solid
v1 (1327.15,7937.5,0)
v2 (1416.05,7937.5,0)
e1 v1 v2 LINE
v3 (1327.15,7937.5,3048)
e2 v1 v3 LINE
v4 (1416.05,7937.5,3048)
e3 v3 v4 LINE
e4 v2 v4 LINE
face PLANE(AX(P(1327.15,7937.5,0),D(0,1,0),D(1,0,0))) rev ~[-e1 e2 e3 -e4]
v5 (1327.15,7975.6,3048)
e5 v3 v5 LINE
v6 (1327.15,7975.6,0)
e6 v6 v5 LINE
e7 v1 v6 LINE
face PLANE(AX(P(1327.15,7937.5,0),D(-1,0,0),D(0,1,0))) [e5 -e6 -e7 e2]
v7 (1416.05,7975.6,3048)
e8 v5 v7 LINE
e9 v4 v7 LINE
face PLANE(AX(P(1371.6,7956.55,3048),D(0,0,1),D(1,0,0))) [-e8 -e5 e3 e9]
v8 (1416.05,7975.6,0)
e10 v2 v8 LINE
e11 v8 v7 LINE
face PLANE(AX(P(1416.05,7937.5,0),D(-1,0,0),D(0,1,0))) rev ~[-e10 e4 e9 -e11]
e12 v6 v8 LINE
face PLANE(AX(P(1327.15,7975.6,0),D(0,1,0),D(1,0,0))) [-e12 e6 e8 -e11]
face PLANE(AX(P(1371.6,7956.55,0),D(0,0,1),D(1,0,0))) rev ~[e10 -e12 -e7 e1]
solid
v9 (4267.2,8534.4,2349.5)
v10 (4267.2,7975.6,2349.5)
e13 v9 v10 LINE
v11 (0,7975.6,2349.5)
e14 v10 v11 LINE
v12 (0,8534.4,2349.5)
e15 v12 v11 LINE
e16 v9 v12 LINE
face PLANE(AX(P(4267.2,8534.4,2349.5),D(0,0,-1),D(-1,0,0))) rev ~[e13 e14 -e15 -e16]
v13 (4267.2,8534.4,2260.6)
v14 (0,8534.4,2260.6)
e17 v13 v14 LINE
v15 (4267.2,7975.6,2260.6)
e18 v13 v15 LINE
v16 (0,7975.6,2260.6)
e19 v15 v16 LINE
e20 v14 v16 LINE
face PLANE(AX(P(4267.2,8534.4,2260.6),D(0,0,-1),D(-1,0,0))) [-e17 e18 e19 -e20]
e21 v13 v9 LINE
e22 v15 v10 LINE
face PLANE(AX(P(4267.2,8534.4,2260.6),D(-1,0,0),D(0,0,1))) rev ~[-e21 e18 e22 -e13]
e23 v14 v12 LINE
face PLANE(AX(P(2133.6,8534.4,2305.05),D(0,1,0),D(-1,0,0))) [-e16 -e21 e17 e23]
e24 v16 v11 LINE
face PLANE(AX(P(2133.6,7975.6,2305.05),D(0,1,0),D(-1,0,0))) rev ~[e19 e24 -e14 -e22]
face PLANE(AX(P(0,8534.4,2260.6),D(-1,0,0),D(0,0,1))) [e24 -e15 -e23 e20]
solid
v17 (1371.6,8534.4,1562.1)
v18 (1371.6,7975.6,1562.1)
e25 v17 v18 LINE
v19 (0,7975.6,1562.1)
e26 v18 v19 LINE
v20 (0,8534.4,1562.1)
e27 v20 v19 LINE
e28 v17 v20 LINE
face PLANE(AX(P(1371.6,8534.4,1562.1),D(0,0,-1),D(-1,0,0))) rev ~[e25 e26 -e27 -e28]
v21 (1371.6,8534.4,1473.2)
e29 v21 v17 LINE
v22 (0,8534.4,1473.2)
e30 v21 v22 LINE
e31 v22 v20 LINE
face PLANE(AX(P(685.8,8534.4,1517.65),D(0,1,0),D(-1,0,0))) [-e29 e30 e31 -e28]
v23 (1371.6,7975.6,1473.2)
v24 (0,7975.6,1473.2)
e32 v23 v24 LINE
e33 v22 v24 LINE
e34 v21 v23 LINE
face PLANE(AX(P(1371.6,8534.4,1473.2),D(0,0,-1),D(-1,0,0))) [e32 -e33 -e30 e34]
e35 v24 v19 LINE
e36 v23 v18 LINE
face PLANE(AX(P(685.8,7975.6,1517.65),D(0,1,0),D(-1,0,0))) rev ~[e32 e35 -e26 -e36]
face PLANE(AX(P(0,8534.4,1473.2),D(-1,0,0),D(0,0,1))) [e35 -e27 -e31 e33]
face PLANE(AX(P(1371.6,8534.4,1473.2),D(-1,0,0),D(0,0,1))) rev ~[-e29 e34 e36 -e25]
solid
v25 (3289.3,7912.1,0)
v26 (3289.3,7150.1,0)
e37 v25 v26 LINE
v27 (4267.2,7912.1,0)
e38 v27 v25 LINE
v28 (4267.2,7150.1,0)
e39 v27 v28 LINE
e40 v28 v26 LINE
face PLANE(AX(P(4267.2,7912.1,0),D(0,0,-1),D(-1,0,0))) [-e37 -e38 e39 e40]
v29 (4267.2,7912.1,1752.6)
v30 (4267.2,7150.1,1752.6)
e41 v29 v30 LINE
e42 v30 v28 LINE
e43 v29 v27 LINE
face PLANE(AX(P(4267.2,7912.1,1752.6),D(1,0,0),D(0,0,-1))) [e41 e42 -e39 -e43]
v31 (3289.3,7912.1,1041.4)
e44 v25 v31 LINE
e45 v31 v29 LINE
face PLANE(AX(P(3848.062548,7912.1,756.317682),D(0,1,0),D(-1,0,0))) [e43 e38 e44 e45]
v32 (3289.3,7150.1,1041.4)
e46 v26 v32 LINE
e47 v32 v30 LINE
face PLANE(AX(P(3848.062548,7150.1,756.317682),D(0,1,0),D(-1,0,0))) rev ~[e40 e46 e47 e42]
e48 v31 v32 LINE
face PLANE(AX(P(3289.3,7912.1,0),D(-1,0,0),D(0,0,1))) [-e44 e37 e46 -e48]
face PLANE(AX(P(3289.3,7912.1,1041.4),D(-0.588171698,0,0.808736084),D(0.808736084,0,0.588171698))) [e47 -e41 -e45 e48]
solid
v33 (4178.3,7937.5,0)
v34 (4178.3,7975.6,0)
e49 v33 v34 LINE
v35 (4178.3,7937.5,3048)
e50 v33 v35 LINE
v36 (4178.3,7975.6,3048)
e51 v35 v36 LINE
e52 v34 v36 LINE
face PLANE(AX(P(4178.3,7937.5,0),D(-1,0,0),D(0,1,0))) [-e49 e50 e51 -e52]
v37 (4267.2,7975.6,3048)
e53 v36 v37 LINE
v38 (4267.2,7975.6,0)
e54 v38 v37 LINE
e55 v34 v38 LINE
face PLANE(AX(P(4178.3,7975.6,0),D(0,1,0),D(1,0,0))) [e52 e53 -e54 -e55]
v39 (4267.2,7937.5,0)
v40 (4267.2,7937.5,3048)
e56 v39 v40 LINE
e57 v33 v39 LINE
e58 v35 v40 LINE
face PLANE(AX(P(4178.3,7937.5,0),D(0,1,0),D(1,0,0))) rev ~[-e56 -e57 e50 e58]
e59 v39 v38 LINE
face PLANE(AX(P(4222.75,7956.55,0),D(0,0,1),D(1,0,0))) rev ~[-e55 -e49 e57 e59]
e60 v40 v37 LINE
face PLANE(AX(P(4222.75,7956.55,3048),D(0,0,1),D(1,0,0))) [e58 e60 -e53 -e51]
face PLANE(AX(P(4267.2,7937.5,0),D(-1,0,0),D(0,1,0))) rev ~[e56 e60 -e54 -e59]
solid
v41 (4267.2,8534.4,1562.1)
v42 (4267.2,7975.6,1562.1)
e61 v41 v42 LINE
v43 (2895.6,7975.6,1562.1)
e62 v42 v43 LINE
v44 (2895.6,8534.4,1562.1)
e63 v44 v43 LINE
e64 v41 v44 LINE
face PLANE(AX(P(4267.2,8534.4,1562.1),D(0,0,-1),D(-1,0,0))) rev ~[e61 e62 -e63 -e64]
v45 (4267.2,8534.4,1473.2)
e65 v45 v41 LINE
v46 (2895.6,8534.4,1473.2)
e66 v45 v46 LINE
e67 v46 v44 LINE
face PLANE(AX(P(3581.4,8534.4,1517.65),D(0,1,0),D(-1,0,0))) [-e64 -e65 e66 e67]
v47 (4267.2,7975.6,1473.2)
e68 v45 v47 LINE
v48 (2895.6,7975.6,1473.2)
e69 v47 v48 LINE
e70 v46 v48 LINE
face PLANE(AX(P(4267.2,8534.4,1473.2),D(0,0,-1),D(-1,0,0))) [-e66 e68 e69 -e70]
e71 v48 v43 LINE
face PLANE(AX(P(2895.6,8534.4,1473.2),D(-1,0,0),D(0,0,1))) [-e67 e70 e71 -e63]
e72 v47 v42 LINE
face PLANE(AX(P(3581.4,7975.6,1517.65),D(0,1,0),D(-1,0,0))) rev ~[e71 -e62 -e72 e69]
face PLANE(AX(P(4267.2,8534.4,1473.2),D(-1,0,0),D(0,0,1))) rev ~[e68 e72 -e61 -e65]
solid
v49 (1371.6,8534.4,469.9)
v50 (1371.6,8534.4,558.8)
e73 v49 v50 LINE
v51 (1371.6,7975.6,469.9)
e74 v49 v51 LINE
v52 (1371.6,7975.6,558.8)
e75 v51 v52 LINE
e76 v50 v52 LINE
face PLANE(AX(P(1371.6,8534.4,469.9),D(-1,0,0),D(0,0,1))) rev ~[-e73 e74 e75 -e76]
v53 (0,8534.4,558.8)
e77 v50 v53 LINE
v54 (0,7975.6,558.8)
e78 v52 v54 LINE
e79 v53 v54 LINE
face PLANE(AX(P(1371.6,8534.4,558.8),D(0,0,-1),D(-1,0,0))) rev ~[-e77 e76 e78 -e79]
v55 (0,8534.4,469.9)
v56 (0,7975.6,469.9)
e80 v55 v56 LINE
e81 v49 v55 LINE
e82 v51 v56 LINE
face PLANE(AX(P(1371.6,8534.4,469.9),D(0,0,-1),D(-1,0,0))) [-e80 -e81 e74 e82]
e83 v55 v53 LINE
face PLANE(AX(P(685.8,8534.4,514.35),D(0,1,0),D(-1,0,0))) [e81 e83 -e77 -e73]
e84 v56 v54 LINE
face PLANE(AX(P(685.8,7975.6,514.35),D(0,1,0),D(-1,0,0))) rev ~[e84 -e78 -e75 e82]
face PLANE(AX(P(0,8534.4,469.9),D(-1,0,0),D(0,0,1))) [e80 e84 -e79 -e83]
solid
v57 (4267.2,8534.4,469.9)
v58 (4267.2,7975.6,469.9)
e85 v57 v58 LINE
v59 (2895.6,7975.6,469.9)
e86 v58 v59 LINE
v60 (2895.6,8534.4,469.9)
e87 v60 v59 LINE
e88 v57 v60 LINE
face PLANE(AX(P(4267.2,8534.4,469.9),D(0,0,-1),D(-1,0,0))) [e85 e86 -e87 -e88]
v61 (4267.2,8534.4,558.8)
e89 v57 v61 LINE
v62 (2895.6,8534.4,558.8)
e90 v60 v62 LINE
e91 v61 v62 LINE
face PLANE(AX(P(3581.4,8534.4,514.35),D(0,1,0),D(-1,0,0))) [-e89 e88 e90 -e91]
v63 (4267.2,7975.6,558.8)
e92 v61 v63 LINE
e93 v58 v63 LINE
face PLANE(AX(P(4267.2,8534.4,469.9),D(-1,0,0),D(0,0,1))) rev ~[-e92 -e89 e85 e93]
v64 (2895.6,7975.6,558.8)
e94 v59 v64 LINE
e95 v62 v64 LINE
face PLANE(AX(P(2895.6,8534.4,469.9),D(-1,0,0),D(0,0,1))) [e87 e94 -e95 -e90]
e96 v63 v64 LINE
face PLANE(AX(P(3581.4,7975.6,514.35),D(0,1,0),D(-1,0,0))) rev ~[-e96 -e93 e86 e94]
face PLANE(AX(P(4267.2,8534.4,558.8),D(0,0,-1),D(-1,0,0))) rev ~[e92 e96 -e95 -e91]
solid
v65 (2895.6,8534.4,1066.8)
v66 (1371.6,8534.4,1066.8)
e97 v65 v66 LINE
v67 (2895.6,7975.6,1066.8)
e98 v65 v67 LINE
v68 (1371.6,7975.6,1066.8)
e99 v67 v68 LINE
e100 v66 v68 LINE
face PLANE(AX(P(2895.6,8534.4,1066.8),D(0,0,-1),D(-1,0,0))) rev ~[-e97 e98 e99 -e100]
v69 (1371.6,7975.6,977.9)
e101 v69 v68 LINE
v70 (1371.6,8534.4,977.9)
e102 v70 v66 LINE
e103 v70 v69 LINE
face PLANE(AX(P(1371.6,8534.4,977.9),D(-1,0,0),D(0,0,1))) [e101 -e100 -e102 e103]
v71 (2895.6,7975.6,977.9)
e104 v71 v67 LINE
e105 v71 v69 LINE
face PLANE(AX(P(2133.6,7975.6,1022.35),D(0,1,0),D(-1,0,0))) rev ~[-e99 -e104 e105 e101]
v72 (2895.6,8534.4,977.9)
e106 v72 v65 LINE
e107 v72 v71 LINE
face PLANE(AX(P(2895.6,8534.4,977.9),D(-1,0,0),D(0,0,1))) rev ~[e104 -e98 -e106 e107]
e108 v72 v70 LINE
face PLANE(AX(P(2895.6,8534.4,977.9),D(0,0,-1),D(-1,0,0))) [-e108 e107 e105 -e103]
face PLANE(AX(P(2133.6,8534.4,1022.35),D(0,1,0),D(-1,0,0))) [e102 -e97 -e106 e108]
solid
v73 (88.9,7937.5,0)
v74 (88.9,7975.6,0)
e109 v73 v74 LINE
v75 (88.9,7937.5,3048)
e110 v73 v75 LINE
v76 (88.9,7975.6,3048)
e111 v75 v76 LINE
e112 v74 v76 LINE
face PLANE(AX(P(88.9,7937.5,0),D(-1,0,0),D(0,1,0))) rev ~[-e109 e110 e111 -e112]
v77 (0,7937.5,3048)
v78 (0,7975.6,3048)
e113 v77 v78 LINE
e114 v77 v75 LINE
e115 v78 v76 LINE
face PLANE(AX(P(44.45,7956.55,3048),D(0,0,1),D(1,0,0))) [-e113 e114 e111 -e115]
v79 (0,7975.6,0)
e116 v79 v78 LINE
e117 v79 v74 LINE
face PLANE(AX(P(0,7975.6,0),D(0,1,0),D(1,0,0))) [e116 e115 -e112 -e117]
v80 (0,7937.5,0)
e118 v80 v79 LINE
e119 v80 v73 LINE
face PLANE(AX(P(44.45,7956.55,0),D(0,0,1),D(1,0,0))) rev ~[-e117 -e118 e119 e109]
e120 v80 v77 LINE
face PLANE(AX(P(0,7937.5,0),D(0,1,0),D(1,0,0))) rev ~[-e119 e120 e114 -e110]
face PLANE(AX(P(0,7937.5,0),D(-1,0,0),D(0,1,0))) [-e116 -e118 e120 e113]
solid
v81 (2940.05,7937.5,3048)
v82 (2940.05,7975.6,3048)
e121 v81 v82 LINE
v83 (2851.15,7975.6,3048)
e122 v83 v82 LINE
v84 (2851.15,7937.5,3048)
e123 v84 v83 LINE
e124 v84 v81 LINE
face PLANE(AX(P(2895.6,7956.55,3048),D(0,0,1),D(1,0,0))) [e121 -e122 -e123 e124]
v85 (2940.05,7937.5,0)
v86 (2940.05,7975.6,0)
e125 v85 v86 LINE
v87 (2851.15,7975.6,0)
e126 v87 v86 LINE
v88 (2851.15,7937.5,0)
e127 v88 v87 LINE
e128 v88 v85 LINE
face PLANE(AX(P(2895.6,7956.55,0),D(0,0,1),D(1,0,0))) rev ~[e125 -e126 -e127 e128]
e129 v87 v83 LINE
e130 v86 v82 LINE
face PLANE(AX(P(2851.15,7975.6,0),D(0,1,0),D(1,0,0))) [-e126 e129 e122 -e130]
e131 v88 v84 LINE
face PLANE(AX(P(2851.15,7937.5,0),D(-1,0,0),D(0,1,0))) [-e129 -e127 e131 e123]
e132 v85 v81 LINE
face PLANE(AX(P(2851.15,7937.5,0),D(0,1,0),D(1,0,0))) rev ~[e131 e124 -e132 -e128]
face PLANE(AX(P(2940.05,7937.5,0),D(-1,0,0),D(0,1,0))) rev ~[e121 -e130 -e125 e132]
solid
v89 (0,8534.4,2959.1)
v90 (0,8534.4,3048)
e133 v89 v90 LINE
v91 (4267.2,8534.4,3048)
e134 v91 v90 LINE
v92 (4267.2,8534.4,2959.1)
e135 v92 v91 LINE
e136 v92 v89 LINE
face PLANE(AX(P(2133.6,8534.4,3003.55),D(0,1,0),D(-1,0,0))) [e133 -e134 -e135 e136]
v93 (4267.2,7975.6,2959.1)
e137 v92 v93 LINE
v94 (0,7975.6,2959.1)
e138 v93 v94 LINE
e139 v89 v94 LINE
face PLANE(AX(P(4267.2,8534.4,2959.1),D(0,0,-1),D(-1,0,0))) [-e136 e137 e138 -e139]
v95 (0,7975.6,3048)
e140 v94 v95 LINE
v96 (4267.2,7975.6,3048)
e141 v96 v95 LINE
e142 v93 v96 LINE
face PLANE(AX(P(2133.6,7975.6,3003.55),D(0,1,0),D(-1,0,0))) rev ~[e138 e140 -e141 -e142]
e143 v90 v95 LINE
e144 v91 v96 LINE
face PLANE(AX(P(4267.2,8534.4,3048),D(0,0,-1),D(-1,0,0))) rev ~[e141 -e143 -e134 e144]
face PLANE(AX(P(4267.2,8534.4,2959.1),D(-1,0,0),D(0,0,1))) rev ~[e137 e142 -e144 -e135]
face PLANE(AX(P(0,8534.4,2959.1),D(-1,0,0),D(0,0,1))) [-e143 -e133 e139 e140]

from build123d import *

# Parameters (mm, degrees)
F4_DEPTH = 762
F5_W     = 1524
F5_H     = 88.9
F6_DEPTH = 558.8
F5_W_2   = 1371.6
F5_W_3   = 4267.2
F7_W     = 88.9
F7_H     = 38.1
F8_DEPTH = 3048


with BuildPart() as f4:
    # F3 (on face) → F4 (new body)
    with BuildSketch(Plane(origin=(0, 7912.1, 0), x_dir=(-1, 0, 0), z_dir=(0, 1, 0))):
        Polygon((-3289.3, 1041.4), (-4267.2, 1752.6), (-4267.2, 0), (-3289.3, 0), align=None)
    extrude(amount=-F4_DEPTH)


with BuildPart() as f6:
    # F5 (on face) → F6 (new body)
    with BuildSketch(Plane(origin=(0, 8534.4, 0), x_dir=(-1, 0, 0), z_dir=(0, 1, 0))):
        with Locations((-2133.6, 1022.35)):
            Rectangle(F5_W, F5_H)
    extrude(amount=-F6_DEPTH)


with BuildPart() as f6b:
    # F5 (on face) → F6, piece 2 (new body)
    with BuildSketch(Plane(origin=(0, 8534.4, 0), x_dir=(-1, 0, 0), z_dir=(0, 1, 0))):
        with Locations((-685.8, 1517.65)):
            Rectangle(F5_W_2, F5_H)
    extrude(amount=-F6_DEPTH)


with BuildPart() as f6c:
    # F5 (on face) → F6, piece 3 (new body)
    with BuildSketch(Plane(origin=(0, 8534.4, 0), x_dir=(-1, 0, 0), z_dir=(0, 1, 0))):
        with Locations((-685.8, 514.35)):
            Rectangle(F5_W_2, F5_H)
    extrude(amount=-F6_DEPTH)


with BuildPart() as f6d:
    # F5 (on face) → F6, piece 4 (new body)
    with BuildSketch(Plane(origin=(0, 8534.4, 0), x_dir=(-1, 0, 0), z_dir=(0, 1, 0))):
        with Locations((-2133.6, 3003.55)):
            Rectangle(F5_W_3, F5_H)
    extrude(amount=-F6_DEPTH)


with BuildPart() as f6e:
    # F5 (on face) → F6, piece 5 (new body)
    with BuildSketch(Plane(origin=(0, 8534.4, 0), x_dir=(-1, 0, 0), z_dir=(0, 1, 0))):
        with Locations((-3581.4, 1517.65)):
            Rectangle(F5_W_2, F5_H)
    extrude(amount=-F6_DEPTH)


with BuildPart() as f6f:
    # F5 (on face) → F6, piece 6 (new body)
    with BuildSketch(Plane(origin=(0, 8534.4, 0), x_dir=(-1, 0, 0), z_dir=(0, 1, 0))):
        with Locations((-3581.4, 514.35)):
            Rectangle(F5_W_2, F5_H)
    extrude(amount=-F6_DEPTH)


with BuildPart() as f6g:
    # F5 (on face) → F6, piece 7 (new body)
    with BuildSketch(Plane(origin=(0, 8534.4, 0), x_dir=(-1, 0, 0), z_dir=(0, 1, 0))):
        with Locations((-2133.6, 2305.05)):
            Rectangle(F5_W_3, F5_H)
    extrude(amount=-F6_DEPTH)


with BuildPart() as f8:
    # F7 (on face) → F8 (new body)
    with BuildSketch(Plane.XY):
        with Locations((4222.75, 7956.55)):
            Rectangle(F7_W, F7_H)
    extrude(amount=F8_DEPTH)


with BuildPart() as f8b:
    # F7 (on face) → F8, piece 2 (new body)
    with BuildSketch(Plane.XY):
        with Locations((2895.6, 7956.55)):
            Rectangle(F7_W, F7_H)
    extrude(amount=F8_DEPTH)


with BuildPart() as f8c:
    # F7 (on face) → F8, piece 3 (new body)
    with BuildSketch(Plane.XY):
        with Locations((1371.6, 7956.55)):
            Rectangle(F7_W, F7_H)
    extrude(amount=F8_DEPTH)


with BuildPart() as f8d:
    # F7 (on face) → F8, piece 4 (new body)
    with BuildSketch(Plane.XY):
        with Locations((44.45, 7956.55)):
            Rectangle(F7_W, F7_H)
    extrude(amount=F8_DEPTH)


solid = Compound([f4.part, f6.part, f6b.part, f6c.part, f6d.part, f6e.part, f6f.part, f6g.part, f8.part, f8b.part, f8c.part, f8d.part])
